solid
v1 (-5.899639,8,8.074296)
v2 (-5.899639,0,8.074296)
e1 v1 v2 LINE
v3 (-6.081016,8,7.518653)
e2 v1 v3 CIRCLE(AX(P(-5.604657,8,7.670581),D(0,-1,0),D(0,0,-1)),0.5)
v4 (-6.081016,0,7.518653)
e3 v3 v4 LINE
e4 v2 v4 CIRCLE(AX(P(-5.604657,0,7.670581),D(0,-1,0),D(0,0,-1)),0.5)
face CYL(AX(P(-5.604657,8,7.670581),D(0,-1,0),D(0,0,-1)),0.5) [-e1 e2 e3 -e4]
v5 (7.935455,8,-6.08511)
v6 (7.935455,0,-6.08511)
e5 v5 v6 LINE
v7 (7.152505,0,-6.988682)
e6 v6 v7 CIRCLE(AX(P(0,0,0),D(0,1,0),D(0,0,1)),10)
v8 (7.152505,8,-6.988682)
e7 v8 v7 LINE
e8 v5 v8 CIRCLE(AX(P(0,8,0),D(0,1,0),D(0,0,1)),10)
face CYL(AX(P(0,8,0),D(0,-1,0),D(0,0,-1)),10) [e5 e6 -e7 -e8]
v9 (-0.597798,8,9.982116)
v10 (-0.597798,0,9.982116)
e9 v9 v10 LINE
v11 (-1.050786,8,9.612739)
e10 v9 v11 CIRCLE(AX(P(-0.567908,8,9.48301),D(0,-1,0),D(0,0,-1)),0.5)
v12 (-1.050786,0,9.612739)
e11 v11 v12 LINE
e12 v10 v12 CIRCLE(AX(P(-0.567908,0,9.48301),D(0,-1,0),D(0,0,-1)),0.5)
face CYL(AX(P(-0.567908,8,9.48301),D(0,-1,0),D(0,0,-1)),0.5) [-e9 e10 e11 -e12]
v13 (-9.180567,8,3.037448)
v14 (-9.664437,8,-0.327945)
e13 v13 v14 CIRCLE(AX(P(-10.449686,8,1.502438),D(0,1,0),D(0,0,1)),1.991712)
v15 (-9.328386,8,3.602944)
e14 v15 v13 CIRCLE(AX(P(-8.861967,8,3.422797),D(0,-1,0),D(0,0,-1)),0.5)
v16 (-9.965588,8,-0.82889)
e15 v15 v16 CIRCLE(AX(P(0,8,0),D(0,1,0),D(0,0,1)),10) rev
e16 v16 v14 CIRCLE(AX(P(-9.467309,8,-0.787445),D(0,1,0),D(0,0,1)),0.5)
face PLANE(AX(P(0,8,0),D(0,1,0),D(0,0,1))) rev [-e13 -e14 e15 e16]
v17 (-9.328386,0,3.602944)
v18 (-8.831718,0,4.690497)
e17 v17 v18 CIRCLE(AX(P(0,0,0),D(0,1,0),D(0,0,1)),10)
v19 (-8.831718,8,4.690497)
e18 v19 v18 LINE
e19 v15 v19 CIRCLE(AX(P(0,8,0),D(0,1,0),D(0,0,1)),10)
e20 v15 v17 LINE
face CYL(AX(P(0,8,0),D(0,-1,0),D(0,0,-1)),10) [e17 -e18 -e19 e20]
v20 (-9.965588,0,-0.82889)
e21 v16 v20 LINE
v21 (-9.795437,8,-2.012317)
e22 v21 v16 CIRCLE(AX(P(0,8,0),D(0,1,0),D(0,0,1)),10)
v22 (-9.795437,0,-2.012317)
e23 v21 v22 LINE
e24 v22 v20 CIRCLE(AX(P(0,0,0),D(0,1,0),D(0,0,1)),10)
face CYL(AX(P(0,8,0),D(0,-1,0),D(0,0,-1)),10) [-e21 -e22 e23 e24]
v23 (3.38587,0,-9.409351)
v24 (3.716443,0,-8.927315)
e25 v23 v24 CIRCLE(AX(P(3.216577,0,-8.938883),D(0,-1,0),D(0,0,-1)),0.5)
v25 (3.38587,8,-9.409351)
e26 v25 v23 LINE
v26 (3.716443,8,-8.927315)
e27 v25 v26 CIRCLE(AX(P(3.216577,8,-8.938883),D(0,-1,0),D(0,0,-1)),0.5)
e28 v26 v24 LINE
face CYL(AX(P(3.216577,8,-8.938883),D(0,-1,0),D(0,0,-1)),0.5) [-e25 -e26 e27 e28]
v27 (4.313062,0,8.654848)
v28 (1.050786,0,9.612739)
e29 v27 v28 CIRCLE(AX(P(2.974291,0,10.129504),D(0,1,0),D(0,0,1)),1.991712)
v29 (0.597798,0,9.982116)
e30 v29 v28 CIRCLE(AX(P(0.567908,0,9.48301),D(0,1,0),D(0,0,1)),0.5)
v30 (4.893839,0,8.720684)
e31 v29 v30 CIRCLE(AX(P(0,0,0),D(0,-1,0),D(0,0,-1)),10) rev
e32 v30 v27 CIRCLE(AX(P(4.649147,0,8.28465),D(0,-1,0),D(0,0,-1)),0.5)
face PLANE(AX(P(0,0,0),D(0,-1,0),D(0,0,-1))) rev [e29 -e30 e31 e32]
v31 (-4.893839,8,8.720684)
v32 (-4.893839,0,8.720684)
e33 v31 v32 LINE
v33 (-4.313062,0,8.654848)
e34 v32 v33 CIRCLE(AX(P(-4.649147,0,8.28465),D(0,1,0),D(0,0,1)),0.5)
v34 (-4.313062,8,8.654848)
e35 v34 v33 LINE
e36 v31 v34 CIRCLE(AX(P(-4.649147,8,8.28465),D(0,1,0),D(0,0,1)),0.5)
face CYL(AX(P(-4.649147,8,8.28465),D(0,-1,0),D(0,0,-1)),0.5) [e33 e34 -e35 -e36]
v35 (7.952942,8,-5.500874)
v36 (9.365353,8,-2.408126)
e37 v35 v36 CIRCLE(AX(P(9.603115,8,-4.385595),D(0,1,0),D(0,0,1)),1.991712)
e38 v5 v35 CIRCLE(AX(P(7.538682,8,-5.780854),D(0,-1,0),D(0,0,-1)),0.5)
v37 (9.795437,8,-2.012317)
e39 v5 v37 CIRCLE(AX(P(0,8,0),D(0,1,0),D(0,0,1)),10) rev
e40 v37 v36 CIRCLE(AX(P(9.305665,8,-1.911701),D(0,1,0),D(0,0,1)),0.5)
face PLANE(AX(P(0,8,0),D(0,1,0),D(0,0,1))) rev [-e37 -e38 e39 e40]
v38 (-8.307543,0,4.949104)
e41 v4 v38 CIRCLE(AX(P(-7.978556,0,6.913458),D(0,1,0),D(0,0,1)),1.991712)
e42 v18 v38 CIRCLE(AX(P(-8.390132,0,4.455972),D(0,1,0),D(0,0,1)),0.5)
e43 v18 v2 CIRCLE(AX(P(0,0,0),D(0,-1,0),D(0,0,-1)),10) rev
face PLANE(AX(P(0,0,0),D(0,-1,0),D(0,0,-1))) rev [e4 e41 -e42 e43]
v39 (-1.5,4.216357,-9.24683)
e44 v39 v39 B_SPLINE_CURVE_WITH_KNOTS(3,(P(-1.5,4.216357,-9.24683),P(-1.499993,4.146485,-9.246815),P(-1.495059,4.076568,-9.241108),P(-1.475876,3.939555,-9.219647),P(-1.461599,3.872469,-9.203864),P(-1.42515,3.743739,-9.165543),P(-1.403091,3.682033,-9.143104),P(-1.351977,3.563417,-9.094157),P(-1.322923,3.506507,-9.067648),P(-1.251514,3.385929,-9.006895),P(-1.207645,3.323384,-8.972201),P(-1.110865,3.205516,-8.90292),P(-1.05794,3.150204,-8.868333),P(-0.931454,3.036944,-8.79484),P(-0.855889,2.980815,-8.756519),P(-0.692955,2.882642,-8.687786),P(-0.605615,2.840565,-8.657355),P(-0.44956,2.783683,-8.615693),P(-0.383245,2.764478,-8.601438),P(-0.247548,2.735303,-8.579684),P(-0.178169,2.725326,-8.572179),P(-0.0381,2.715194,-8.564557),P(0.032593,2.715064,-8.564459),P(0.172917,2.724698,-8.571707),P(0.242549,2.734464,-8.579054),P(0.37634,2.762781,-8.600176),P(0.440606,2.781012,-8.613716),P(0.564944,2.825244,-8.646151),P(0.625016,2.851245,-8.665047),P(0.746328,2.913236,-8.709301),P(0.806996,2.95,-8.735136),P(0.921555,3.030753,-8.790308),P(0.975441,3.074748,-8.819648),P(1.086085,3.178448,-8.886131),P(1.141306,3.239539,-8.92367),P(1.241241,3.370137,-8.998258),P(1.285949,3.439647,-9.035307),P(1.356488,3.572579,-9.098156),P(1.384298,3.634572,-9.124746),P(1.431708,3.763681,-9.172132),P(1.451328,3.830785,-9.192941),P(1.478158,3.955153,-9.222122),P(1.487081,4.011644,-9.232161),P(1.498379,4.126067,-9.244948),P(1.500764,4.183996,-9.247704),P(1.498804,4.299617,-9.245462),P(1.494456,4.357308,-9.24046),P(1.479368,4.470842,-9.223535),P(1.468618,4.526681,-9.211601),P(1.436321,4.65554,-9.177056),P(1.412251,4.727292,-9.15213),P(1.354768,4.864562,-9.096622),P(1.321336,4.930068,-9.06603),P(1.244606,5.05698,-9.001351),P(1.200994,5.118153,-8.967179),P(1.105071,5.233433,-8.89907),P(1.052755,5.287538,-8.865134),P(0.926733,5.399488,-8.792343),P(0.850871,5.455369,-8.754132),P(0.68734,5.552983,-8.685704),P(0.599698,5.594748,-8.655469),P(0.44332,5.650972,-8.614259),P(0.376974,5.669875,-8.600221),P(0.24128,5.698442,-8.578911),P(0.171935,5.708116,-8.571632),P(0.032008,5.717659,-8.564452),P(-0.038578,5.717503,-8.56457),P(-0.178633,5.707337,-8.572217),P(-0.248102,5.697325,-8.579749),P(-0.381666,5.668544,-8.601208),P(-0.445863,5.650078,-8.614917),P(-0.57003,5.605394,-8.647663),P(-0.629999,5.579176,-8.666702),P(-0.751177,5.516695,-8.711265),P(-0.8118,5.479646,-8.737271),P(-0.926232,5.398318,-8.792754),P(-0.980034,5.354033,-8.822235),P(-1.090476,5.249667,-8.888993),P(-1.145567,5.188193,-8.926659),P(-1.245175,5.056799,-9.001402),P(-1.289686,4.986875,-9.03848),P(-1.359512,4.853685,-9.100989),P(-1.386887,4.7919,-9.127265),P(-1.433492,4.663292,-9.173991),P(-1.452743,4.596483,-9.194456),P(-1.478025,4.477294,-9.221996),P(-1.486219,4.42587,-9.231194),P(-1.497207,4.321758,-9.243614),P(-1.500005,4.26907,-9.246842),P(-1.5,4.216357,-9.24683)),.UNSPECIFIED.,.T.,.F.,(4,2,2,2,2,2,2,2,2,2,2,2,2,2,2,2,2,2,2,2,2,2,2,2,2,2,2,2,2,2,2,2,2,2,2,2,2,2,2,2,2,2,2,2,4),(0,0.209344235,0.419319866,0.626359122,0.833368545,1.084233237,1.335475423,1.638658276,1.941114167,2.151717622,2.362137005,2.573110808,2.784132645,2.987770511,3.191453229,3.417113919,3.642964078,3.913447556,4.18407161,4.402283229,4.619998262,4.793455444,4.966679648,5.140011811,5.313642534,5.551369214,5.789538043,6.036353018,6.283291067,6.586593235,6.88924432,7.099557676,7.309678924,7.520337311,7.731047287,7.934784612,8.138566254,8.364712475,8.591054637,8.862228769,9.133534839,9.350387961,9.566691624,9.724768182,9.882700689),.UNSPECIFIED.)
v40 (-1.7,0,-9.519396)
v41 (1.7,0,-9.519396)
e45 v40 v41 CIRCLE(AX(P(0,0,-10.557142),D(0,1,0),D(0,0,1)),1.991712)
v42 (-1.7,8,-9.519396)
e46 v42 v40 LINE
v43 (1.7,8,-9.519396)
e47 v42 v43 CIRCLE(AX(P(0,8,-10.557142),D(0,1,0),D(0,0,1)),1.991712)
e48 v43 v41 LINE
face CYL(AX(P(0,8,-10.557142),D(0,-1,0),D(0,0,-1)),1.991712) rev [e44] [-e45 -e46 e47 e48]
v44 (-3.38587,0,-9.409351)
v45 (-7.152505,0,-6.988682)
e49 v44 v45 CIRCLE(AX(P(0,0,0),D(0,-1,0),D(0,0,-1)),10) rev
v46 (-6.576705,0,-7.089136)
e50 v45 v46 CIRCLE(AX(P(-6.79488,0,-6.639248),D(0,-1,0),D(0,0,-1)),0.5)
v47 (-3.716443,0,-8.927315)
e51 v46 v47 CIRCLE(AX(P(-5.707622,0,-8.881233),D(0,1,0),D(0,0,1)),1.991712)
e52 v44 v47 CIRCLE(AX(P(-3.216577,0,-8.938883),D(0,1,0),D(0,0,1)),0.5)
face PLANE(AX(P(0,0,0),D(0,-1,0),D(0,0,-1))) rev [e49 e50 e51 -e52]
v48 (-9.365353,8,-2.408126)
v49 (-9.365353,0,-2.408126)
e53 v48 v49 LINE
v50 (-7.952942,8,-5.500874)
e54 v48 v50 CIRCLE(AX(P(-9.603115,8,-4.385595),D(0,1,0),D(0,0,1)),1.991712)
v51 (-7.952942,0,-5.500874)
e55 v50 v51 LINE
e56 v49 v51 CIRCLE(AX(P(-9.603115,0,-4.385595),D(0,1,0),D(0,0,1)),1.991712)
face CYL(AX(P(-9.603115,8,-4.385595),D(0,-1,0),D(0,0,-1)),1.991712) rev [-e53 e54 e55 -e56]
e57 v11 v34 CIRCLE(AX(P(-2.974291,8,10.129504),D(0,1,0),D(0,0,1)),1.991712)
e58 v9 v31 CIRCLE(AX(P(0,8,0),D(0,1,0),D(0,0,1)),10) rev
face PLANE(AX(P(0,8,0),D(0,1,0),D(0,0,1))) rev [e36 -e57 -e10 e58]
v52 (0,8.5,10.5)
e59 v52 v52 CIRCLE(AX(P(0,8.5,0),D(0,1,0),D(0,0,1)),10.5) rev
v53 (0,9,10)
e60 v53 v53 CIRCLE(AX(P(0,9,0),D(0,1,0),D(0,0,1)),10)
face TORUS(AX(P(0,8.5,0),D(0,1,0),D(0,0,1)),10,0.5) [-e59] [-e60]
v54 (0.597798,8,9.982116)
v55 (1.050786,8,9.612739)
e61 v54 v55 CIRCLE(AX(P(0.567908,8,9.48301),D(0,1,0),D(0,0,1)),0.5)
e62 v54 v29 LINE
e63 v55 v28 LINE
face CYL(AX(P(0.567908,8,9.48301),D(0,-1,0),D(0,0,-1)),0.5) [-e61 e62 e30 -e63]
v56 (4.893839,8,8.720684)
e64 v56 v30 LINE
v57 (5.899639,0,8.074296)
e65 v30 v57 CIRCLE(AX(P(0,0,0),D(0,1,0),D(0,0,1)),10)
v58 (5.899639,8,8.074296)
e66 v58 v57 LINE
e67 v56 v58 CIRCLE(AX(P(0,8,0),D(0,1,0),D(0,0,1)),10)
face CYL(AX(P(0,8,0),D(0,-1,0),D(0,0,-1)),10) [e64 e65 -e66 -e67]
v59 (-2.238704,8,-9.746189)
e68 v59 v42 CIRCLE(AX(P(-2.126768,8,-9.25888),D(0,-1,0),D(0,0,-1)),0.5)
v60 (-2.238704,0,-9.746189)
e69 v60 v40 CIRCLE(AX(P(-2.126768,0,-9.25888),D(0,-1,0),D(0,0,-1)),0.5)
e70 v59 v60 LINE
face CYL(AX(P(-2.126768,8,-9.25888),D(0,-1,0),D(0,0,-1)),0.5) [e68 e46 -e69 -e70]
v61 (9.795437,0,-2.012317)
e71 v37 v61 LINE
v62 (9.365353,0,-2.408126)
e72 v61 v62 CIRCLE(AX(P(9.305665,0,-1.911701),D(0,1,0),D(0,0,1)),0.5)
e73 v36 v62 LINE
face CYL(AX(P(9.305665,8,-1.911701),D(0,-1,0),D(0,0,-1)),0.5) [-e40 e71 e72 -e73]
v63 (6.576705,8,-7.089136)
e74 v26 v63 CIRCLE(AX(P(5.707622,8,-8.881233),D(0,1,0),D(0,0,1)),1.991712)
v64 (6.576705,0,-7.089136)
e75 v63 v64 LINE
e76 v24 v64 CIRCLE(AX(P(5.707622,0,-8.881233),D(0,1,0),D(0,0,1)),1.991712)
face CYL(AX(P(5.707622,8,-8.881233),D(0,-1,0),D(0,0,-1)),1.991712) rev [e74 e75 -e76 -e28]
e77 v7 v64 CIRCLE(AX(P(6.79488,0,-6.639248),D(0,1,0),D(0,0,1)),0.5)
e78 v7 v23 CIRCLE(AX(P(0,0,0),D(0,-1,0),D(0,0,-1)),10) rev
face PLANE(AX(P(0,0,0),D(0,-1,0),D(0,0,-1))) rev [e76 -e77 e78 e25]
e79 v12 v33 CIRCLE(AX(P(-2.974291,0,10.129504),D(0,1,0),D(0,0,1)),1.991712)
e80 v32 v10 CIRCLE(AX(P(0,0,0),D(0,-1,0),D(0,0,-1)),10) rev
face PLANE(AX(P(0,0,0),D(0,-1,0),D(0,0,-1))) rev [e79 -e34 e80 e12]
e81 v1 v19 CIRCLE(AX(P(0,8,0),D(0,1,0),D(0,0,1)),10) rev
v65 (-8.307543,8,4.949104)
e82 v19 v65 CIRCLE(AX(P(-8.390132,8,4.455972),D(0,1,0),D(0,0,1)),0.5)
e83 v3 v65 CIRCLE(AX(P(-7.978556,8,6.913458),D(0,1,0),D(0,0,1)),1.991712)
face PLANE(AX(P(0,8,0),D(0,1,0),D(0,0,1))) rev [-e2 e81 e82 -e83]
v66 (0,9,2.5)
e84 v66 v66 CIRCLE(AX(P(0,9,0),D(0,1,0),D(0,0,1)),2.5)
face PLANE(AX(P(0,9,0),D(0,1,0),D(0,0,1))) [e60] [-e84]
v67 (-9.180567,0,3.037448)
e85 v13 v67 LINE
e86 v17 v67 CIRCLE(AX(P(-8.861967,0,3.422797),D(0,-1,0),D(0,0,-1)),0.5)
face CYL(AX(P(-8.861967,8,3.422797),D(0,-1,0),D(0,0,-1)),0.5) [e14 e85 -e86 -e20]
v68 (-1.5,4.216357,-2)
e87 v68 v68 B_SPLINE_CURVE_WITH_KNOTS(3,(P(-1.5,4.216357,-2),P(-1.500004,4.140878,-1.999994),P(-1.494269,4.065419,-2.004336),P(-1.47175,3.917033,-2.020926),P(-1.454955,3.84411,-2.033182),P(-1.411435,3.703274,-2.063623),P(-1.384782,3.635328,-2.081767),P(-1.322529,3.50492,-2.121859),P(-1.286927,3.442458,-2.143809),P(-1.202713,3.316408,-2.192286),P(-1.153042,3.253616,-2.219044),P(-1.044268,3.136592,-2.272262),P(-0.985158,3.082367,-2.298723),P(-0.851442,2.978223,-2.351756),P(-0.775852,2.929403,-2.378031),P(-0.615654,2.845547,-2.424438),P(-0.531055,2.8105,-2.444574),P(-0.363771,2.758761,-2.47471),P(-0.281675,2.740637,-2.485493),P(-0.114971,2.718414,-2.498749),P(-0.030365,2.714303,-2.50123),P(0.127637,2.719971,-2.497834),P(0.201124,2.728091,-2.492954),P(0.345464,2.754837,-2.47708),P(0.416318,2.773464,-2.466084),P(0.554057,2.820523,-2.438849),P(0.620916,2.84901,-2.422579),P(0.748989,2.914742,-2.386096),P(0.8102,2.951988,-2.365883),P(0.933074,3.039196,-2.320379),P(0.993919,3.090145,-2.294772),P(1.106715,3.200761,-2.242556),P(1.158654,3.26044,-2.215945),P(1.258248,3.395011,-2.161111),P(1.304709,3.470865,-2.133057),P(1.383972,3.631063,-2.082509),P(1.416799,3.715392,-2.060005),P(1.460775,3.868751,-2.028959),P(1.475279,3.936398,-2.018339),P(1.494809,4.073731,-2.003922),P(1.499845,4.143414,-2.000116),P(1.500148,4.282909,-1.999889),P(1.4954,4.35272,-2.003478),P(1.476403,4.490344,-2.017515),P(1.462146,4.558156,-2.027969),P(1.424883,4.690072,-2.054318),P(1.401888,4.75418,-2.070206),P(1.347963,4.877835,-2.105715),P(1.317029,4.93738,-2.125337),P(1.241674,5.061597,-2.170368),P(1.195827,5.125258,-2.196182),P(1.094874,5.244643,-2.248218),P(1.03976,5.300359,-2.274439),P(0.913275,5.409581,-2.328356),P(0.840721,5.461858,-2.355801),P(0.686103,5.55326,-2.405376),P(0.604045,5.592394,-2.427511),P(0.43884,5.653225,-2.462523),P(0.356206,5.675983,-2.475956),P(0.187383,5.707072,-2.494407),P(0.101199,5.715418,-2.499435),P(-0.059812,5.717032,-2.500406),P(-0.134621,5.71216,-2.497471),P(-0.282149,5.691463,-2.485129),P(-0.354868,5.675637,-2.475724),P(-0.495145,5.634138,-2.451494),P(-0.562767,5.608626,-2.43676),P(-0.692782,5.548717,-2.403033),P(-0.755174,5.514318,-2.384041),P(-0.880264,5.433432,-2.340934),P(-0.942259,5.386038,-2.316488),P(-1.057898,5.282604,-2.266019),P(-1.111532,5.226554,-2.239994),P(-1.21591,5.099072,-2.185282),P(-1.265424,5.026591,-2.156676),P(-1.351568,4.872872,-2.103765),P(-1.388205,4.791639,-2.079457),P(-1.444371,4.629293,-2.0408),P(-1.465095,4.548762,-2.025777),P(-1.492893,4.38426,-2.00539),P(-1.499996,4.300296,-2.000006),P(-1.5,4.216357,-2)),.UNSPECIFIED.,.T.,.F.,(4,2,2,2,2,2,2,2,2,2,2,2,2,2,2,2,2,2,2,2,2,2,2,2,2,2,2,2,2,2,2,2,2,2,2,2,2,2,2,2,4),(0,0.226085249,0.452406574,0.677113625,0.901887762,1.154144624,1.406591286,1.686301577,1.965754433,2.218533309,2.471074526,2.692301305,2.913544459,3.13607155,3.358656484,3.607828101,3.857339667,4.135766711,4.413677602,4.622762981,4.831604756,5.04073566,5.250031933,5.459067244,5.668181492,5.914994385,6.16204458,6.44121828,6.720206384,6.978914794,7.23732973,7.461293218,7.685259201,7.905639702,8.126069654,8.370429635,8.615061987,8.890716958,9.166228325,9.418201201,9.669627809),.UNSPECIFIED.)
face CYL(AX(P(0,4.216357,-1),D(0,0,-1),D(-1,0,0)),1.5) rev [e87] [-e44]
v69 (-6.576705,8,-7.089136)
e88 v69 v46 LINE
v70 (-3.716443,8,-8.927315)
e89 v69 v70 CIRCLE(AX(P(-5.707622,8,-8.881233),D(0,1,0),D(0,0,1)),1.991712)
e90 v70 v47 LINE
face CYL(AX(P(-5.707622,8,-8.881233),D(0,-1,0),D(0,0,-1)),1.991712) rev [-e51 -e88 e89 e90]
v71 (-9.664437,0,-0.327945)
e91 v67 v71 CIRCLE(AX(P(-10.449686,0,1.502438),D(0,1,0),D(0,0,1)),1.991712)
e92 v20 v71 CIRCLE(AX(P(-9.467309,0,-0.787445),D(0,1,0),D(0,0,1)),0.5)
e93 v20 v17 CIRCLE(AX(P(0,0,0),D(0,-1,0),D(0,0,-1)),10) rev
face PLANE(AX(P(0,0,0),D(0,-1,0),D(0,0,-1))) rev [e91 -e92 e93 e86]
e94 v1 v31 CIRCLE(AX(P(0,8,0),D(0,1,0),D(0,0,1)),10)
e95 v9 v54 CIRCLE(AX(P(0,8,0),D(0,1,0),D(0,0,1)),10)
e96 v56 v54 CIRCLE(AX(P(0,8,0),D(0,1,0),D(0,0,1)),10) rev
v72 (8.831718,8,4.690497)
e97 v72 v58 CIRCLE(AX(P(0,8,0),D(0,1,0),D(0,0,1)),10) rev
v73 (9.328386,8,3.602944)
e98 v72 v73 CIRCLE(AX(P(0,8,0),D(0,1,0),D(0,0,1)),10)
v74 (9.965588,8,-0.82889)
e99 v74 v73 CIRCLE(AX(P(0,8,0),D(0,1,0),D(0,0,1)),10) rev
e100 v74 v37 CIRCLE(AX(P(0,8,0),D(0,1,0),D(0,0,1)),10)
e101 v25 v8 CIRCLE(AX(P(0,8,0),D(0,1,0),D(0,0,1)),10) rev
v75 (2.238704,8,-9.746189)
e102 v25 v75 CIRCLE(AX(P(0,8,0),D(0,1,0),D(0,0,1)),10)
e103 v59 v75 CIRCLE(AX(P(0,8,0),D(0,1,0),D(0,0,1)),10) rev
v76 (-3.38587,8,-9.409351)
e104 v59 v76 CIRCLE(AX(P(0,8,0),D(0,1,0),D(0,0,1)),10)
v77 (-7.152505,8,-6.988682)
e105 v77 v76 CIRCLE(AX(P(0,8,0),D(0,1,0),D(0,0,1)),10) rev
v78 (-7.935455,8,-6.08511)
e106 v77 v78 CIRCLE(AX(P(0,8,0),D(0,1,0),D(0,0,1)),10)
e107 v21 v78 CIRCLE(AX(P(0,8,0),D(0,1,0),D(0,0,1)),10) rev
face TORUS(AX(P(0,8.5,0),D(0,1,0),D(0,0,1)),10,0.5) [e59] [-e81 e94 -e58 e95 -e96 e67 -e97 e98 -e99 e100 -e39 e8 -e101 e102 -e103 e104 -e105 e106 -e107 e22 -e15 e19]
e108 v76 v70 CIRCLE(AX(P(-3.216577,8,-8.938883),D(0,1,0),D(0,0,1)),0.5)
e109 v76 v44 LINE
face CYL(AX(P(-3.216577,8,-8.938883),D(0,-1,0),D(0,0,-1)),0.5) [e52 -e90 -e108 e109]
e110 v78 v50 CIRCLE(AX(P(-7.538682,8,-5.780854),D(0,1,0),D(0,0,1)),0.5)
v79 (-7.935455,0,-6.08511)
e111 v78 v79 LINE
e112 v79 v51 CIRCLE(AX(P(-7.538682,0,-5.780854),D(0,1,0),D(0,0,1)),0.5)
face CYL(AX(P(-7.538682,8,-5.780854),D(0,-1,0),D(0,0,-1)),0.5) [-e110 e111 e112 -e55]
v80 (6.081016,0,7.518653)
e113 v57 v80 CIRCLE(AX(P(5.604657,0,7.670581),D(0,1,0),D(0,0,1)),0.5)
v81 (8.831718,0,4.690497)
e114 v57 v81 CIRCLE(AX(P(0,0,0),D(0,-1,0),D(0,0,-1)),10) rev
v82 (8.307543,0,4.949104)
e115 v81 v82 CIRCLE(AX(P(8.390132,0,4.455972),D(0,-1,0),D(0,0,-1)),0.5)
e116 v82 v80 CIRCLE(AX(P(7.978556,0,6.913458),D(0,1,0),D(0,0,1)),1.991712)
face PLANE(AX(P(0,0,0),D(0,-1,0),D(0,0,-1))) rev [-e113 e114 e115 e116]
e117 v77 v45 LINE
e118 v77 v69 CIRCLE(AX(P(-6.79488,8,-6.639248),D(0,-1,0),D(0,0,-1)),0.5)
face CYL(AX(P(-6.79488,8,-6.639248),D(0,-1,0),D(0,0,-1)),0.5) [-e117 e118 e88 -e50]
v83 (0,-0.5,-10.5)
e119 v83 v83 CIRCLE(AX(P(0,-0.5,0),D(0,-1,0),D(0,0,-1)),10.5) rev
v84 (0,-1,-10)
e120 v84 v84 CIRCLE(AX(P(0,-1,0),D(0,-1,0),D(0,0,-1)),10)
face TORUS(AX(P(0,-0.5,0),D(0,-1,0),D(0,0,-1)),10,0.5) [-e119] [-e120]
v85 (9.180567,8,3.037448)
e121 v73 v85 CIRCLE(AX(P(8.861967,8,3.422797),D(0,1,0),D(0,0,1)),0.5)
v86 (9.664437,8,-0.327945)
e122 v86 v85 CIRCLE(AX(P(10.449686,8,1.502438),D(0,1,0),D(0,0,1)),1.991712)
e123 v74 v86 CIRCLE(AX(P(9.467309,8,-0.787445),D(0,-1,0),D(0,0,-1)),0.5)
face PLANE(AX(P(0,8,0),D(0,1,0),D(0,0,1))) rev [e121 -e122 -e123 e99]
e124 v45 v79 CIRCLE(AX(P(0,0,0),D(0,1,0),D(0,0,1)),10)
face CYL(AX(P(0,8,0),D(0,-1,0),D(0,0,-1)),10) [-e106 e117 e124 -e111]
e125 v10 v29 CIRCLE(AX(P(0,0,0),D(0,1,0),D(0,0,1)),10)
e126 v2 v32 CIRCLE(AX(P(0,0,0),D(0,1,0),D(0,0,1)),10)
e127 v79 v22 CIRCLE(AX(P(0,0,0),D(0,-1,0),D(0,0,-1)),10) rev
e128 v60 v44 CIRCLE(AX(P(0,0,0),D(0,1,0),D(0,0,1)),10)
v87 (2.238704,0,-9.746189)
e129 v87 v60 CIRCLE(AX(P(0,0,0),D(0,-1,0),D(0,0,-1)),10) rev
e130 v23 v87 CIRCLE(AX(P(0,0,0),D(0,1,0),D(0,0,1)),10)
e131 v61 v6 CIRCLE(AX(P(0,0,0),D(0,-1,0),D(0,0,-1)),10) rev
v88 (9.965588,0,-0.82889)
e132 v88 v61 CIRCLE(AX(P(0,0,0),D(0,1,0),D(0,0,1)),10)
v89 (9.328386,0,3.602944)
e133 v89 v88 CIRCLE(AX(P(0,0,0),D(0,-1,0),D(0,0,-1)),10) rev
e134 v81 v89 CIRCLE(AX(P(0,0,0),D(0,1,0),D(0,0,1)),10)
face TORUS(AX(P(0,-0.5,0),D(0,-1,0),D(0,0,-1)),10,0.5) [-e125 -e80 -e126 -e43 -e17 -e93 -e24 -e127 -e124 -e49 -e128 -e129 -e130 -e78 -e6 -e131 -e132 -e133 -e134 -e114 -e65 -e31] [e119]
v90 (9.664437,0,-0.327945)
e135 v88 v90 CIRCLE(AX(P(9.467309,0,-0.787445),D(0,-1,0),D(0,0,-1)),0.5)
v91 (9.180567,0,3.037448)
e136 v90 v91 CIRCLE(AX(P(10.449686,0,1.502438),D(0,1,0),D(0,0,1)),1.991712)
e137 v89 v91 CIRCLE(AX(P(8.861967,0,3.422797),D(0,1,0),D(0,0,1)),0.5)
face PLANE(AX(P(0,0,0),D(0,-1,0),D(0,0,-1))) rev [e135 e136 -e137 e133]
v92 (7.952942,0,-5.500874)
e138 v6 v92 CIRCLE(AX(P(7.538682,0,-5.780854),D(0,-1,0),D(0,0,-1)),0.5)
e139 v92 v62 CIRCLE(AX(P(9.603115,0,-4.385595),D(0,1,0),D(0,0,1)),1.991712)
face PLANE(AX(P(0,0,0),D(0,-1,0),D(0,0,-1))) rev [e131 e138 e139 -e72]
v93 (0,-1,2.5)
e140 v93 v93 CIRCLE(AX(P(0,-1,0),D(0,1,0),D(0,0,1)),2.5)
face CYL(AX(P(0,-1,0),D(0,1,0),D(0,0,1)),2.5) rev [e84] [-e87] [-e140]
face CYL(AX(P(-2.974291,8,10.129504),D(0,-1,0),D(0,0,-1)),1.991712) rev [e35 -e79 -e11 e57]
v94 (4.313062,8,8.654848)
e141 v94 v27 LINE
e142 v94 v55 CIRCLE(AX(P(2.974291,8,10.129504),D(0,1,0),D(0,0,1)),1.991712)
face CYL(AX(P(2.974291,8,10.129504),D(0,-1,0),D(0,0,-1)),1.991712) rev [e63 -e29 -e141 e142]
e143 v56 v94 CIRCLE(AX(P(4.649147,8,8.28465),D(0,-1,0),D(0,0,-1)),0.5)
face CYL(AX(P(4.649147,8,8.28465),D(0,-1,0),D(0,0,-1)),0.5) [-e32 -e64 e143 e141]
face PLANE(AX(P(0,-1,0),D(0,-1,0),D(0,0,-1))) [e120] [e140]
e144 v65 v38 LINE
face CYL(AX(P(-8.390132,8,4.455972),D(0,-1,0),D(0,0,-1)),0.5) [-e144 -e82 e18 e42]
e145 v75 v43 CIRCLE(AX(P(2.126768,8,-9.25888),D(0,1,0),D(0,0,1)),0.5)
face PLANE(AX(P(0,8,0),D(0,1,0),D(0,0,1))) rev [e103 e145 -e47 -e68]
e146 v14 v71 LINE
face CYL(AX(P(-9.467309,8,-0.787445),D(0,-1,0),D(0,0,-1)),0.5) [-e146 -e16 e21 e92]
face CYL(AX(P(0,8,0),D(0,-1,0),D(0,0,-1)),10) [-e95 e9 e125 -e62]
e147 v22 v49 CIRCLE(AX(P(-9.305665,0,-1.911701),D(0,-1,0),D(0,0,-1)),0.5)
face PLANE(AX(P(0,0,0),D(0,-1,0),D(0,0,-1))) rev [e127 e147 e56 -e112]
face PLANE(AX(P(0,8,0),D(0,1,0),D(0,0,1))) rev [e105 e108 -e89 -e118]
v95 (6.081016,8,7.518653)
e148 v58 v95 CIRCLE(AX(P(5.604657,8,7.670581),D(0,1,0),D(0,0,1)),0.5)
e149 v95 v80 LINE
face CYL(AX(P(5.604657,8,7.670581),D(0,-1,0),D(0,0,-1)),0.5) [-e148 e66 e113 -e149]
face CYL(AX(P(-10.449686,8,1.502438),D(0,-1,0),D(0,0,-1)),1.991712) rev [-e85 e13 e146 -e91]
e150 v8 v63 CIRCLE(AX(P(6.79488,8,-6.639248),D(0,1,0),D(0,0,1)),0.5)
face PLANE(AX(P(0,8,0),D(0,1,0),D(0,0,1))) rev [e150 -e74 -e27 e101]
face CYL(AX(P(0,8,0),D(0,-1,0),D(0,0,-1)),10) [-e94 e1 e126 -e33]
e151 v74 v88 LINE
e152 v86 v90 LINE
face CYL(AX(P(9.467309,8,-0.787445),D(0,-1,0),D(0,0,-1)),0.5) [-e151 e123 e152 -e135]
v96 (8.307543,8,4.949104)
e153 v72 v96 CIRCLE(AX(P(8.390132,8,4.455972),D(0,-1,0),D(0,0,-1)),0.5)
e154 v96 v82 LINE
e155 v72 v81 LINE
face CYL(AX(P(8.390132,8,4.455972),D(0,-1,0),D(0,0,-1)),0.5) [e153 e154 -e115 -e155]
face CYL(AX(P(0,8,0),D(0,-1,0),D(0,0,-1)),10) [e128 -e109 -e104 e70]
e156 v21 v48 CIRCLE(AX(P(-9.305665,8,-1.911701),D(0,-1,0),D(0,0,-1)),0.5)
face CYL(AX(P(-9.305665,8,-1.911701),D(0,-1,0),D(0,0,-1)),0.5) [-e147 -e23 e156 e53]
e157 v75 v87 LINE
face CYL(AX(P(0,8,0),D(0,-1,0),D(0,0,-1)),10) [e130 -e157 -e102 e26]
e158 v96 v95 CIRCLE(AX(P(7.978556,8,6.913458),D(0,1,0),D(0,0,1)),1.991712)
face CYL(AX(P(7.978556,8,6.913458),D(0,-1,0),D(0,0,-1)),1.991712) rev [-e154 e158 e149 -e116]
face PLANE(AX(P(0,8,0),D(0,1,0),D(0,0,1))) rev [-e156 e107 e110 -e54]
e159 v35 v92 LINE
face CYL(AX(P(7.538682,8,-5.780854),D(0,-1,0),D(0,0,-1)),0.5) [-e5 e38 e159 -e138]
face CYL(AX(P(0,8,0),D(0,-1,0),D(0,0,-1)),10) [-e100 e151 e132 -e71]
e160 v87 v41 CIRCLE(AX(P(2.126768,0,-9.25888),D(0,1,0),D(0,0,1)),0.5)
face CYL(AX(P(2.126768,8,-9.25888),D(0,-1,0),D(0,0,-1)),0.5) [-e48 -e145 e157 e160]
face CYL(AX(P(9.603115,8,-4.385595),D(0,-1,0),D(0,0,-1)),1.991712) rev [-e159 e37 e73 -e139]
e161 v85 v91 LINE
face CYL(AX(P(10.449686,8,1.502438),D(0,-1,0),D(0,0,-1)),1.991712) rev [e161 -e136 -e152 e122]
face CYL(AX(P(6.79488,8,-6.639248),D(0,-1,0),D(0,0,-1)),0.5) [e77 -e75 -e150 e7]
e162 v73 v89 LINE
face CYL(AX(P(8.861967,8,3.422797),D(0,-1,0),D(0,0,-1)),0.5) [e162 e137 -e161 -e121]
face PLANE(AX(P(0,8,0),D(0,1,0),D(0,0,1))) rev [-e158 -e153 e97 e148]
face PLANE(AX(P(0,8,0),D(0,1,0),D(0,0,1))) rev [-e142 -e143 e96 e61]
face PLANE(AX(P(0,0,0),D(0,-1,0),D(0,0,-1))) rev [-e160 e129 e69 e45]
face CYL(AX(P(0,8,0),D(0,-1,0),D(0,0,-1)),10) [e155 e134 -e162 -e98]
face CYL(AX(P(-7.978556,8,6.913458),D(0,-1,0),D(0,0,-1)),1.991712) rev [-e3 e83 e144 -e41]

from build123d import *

# Parameters (mm, degrees)
EXTRUDE_3_DEPTH     = 8
SKETCH_4_R          = 10.5
EXTRUDE_4_DEPTH     = 1
EXTRUDE_START       = 1
SKETCH_5_R          = 10.5
EXTRUDE_5_DEPTH     = 1
FILLET_1_R          = 0.5
FILLET_2_R          = 0.5
SKETCH_6_R          = 2.5
CUT_EXTRUDE_1_DEPTH = 18.902513907
SKETCH_15_R         = 1.5
CUT_EXTRUDE_3_DEPTH = 9


with BuildPart() as part:
    # 草图1 → 凸台-拉伸3 (new body)
    with BuildSketch(Plane(origin=(0, 0, 0), x_dir=(1, 0, 0), z_dir=(0, 1, 0))):
        with BuildLine():
            ThreePointArc((-2.238703662, 9.746189302), (-2.817325568, 9.594929736), (-3.385870387, 9.40935076))
            ThreePointArc((-3.385870387, 9.40935076), (-3.628927824, 9.221667042), (-3.716443023, 8.927314896))
            ThreePointArc((-3.716443023, 8.927314896), (-4.630821169, 7.205698391), (-6.576705035, 7.089136117))
            ThreePointArc((-6.576705035, 7.089136117), (-6.880812292, 7.131807792), (-7.152505116, 6.988681604))
            ThreePointArc((-7.152505116, 6.988681604), (-7.557495744, 6.548607339), (-7.935454511, 6.085109835))
            ThreePointArc((-7.935454511, 6.085109835), (-8.03845796, 5.795813472), (-7.952941646, 5.500874401))
            ThreePointArc((-7.952941646, 5.500874401), (-7.791389337, 3.558208286), (-9.36535269, 2.408125617))
            ThreePointArc((-9.36535269, 2.408125617), (-9.644254044, 2.279610518), (-9.795436733, 2.012316877))
            ThreePointArc((-9.795436733, 2.012316877), (-9.898214419, 1.423148383), (-9.965587898, 0.828889532))
            ThreePointArc((-9.965587898, 0.828889532), (-9.895834491, 0.529830076), (-9.664437489, 0.327945151))
            ThreePointArc((-9.664437489, 0.327945151), (-8.478246441, -1.218987809), (-9.180567039, -3.037447752))
            ThreePointArc((-9.180567039, -3.037447752), (-9.34571328, -3.296346989), (-9.328386398, -3.602944241))
            ThreePointArc((-9.328386398, -3.602944241), (-9.096319954, -4.15415013), (-8.83171754, -4.69049734))
            ThreePointArc((-8.83171754, -4.69049734), (-8.611353491, -4.904370625), (-8.307542715, -4.949104368))
            ThreePointArc((-8.307542715, -4.949104368), (-6.473320205, -5.609163888), (-6.081016219, -7.518652921))
            ThreePointArc((-6.081016219, -7.518652921), (-6.079974583, -7.825737617), (-5.899639294, -8.074296019))
            ThreePointArc((-5.899639294, -8.074296019), (-5.406408175, -8.412535328), (-4.893839265, -8.720684448))
            ThreePointArc((-4.893839265, -8.720684448), (-4.592828603, -8.781468305), (-4.313061827, -8.654848218))
            ThreePointArc((-4.313061827, -8.654848218), (-2.413160542, -8.218470064), (-1.050785716, -9.612738911))
            ThreePointArc((-1.050785716, -9.612738911), (-0.883886915, -9.870511846), (-0.597798398, -9.982115862))
            ThreePointArc((-0.597798398, -9.982115862), (0, -10), (0.597798398, -9.982115862))
            ThreePointArc((0.597798398, -9.982115862), (0.883886915, -9.870511846), (1.050785716, -9.612738911))
            ThreePointArc((1.050785716, -9.612738911), (2.413160542, -8.218470064), (4.313061827, -8.654848218))
            ThreePointArc((4.313061827, -8.654848218), (4.592828603, -8.781468305), (4.893839265, -8.720684448))
            ThreePointArc((4.893839265, -8.720684448), (5.406408175, -8.412535328), (5.899639294, -8.074296019))
            ThreePointArc((5.899639294, -8.074296019), (6.079974583, -7.825737617), (6.081016219, -7.518652921))
            ThreePointArc((6.081016219, -7.518652921), (6.473320205, -5.609163888), (8.307542715, -4.949104368))
            ThreePointArc((8.307542715, -4.949104368), (8.611353491, -4.904370625), (8.83171754, -4.69049734))
            ThreePointArc((8.83171754, -4.69049734), (9.096319954, -4.15415013), (9.328386398, -3.602944241))
            ThreePointArc((9.328386398, -3.602944241), (9.34571328, -3.296346989), (9.180567039, -3.037447752))
            ThreePointArc((9.180567039, -3.037447752), (8.478246441, -1.218987809), (9.664437489, 0.327945151))
            ThreePointArc((9.664437489, 0.327945151), (9.895834491, 0.529830076), (9.965587898, 0.828889532))
            ThreePointArc((9.965587898, 0.828889532), (9.898214419, 1.423148383), (9.795436733, 2.012316877))
            ThreePointArc((9.795436733, 2.012316877), (9.644254044, 2.279610518), (9.36535269, 2.408125617))
            ThreePointArc((9.36535269, 2.408125617), (7.791389337, 3.558208286), (7.952941646, 5.500874401))
            ThreePointArc((7.952941646, 5.500874401), (8.03845796, 5.795813472), (7.935454511, 6.085109835))
            ThreePointArc((7.935454511, 6.085109835), (7.557495744, 6.548607339), (7.152505116, 6.988681604))
            ThreePointArc((7.152505116, 6.988681604), (6.880812292, 7.131807792), (6.576705035, 7.089136117))
            ThreePointArc((6.576705035, 7.089136117), (4.630821169, 7.205698391), (3.716443023, 8.927314896))
            ThreePointArc((3.716443023, 8.927314896), (3.628927824, 9.221667042), (3.385870387, 9.40935076))
            ThreePointArc((3.385870387, 9.40935076), (2.817325568, 9.594929736), (2.238703662, 9.746189302))
            ThreePointArc((2.238703662, 9.746189302), (1.932761255, 9.719706483), (1.7, 9.519395989))
            ThreePointArc((1.7, 9.519395989), (0, 8.56543017), (-1.7, 9.519395989))
            ThreePointArc((-1.7, 9.519395989), (-1.932761255, 9.719706483), (-2.238703662, 9.746189302))
        make_face()
    extrude(amount=EXTRUDE_3_DEPTH)

    # 草图4 → 凸台-拉伸4 (add)
    with BuildSketch(Plane.XZ):
        with Locations(Location((0, 0, 0), (0, 0, 270))):
            Circle(SKETCH_4_R)
    extrude(amount=EXTRUDE_4_DEPTH)

    # 草图5 → 凸台-拉伸5 (add)
    with BuildSketch(Plane(origin=(0, 8, 0), x_dir=(1, 0, 0), z_dir=(0, 1, 0)).offset(EXTRUDE_START)):
        with Locations(Location((0, 0, 0), (0, 0, 90))):
            Circle(SKETCH_5_R)
    extrude(amount=-EXTRUDE_5_DEPTH)

    # 圆角1
    fillet_1_edges = [part.edges().sort_by_distance(p)[0] for p in [
        (0, 0, 10.5),
        (0, -1, 10.5),
    ]]
    fillet(fillet_1_edges, radius=FILLET_1_R - 0.0001)  # a hair under: the kernel refuses the full size

    # 圆角2
    fillet_2_edges = [part.edges().sort_by_distance(p)[0] for p in [
        (0, 8, 10.5),
        (0, 9, 10.5),
    ]]
    fillet(fillet_2_edges, radius=FILLET_2_R - 0.0001)  # a hair under: the kernel refuses the full size

    # 草图6 → 切除-拉伸1 (cut, through all)
    with BuildSketch(Plane(origin=(0, 9, 0), x_dir=(1, 0, 0), z_dir=(0, 1, 0))):
        with Locations(Location((0, 0, 0), (0, 0, 270))):
            Circle(SKETCH_6_R)
    extrude(amount=-CUT_EXTRUDE_1_DEPTH, mode=Mode.SUBTRACT)

    # 草图15 → 切除-拉伸3 (cut)
    with BuildSketch(Plane.XY.offset(-10)):
        with Locations(Location((0, 4.216357154, 0), (0, 0, 180))):
            Circle(SKETCH_15_R)
    extrude(amount=CUT_EXTRUDE_3_DEPTH, mode=Mode.SUBTRACT)


solid = part.part
